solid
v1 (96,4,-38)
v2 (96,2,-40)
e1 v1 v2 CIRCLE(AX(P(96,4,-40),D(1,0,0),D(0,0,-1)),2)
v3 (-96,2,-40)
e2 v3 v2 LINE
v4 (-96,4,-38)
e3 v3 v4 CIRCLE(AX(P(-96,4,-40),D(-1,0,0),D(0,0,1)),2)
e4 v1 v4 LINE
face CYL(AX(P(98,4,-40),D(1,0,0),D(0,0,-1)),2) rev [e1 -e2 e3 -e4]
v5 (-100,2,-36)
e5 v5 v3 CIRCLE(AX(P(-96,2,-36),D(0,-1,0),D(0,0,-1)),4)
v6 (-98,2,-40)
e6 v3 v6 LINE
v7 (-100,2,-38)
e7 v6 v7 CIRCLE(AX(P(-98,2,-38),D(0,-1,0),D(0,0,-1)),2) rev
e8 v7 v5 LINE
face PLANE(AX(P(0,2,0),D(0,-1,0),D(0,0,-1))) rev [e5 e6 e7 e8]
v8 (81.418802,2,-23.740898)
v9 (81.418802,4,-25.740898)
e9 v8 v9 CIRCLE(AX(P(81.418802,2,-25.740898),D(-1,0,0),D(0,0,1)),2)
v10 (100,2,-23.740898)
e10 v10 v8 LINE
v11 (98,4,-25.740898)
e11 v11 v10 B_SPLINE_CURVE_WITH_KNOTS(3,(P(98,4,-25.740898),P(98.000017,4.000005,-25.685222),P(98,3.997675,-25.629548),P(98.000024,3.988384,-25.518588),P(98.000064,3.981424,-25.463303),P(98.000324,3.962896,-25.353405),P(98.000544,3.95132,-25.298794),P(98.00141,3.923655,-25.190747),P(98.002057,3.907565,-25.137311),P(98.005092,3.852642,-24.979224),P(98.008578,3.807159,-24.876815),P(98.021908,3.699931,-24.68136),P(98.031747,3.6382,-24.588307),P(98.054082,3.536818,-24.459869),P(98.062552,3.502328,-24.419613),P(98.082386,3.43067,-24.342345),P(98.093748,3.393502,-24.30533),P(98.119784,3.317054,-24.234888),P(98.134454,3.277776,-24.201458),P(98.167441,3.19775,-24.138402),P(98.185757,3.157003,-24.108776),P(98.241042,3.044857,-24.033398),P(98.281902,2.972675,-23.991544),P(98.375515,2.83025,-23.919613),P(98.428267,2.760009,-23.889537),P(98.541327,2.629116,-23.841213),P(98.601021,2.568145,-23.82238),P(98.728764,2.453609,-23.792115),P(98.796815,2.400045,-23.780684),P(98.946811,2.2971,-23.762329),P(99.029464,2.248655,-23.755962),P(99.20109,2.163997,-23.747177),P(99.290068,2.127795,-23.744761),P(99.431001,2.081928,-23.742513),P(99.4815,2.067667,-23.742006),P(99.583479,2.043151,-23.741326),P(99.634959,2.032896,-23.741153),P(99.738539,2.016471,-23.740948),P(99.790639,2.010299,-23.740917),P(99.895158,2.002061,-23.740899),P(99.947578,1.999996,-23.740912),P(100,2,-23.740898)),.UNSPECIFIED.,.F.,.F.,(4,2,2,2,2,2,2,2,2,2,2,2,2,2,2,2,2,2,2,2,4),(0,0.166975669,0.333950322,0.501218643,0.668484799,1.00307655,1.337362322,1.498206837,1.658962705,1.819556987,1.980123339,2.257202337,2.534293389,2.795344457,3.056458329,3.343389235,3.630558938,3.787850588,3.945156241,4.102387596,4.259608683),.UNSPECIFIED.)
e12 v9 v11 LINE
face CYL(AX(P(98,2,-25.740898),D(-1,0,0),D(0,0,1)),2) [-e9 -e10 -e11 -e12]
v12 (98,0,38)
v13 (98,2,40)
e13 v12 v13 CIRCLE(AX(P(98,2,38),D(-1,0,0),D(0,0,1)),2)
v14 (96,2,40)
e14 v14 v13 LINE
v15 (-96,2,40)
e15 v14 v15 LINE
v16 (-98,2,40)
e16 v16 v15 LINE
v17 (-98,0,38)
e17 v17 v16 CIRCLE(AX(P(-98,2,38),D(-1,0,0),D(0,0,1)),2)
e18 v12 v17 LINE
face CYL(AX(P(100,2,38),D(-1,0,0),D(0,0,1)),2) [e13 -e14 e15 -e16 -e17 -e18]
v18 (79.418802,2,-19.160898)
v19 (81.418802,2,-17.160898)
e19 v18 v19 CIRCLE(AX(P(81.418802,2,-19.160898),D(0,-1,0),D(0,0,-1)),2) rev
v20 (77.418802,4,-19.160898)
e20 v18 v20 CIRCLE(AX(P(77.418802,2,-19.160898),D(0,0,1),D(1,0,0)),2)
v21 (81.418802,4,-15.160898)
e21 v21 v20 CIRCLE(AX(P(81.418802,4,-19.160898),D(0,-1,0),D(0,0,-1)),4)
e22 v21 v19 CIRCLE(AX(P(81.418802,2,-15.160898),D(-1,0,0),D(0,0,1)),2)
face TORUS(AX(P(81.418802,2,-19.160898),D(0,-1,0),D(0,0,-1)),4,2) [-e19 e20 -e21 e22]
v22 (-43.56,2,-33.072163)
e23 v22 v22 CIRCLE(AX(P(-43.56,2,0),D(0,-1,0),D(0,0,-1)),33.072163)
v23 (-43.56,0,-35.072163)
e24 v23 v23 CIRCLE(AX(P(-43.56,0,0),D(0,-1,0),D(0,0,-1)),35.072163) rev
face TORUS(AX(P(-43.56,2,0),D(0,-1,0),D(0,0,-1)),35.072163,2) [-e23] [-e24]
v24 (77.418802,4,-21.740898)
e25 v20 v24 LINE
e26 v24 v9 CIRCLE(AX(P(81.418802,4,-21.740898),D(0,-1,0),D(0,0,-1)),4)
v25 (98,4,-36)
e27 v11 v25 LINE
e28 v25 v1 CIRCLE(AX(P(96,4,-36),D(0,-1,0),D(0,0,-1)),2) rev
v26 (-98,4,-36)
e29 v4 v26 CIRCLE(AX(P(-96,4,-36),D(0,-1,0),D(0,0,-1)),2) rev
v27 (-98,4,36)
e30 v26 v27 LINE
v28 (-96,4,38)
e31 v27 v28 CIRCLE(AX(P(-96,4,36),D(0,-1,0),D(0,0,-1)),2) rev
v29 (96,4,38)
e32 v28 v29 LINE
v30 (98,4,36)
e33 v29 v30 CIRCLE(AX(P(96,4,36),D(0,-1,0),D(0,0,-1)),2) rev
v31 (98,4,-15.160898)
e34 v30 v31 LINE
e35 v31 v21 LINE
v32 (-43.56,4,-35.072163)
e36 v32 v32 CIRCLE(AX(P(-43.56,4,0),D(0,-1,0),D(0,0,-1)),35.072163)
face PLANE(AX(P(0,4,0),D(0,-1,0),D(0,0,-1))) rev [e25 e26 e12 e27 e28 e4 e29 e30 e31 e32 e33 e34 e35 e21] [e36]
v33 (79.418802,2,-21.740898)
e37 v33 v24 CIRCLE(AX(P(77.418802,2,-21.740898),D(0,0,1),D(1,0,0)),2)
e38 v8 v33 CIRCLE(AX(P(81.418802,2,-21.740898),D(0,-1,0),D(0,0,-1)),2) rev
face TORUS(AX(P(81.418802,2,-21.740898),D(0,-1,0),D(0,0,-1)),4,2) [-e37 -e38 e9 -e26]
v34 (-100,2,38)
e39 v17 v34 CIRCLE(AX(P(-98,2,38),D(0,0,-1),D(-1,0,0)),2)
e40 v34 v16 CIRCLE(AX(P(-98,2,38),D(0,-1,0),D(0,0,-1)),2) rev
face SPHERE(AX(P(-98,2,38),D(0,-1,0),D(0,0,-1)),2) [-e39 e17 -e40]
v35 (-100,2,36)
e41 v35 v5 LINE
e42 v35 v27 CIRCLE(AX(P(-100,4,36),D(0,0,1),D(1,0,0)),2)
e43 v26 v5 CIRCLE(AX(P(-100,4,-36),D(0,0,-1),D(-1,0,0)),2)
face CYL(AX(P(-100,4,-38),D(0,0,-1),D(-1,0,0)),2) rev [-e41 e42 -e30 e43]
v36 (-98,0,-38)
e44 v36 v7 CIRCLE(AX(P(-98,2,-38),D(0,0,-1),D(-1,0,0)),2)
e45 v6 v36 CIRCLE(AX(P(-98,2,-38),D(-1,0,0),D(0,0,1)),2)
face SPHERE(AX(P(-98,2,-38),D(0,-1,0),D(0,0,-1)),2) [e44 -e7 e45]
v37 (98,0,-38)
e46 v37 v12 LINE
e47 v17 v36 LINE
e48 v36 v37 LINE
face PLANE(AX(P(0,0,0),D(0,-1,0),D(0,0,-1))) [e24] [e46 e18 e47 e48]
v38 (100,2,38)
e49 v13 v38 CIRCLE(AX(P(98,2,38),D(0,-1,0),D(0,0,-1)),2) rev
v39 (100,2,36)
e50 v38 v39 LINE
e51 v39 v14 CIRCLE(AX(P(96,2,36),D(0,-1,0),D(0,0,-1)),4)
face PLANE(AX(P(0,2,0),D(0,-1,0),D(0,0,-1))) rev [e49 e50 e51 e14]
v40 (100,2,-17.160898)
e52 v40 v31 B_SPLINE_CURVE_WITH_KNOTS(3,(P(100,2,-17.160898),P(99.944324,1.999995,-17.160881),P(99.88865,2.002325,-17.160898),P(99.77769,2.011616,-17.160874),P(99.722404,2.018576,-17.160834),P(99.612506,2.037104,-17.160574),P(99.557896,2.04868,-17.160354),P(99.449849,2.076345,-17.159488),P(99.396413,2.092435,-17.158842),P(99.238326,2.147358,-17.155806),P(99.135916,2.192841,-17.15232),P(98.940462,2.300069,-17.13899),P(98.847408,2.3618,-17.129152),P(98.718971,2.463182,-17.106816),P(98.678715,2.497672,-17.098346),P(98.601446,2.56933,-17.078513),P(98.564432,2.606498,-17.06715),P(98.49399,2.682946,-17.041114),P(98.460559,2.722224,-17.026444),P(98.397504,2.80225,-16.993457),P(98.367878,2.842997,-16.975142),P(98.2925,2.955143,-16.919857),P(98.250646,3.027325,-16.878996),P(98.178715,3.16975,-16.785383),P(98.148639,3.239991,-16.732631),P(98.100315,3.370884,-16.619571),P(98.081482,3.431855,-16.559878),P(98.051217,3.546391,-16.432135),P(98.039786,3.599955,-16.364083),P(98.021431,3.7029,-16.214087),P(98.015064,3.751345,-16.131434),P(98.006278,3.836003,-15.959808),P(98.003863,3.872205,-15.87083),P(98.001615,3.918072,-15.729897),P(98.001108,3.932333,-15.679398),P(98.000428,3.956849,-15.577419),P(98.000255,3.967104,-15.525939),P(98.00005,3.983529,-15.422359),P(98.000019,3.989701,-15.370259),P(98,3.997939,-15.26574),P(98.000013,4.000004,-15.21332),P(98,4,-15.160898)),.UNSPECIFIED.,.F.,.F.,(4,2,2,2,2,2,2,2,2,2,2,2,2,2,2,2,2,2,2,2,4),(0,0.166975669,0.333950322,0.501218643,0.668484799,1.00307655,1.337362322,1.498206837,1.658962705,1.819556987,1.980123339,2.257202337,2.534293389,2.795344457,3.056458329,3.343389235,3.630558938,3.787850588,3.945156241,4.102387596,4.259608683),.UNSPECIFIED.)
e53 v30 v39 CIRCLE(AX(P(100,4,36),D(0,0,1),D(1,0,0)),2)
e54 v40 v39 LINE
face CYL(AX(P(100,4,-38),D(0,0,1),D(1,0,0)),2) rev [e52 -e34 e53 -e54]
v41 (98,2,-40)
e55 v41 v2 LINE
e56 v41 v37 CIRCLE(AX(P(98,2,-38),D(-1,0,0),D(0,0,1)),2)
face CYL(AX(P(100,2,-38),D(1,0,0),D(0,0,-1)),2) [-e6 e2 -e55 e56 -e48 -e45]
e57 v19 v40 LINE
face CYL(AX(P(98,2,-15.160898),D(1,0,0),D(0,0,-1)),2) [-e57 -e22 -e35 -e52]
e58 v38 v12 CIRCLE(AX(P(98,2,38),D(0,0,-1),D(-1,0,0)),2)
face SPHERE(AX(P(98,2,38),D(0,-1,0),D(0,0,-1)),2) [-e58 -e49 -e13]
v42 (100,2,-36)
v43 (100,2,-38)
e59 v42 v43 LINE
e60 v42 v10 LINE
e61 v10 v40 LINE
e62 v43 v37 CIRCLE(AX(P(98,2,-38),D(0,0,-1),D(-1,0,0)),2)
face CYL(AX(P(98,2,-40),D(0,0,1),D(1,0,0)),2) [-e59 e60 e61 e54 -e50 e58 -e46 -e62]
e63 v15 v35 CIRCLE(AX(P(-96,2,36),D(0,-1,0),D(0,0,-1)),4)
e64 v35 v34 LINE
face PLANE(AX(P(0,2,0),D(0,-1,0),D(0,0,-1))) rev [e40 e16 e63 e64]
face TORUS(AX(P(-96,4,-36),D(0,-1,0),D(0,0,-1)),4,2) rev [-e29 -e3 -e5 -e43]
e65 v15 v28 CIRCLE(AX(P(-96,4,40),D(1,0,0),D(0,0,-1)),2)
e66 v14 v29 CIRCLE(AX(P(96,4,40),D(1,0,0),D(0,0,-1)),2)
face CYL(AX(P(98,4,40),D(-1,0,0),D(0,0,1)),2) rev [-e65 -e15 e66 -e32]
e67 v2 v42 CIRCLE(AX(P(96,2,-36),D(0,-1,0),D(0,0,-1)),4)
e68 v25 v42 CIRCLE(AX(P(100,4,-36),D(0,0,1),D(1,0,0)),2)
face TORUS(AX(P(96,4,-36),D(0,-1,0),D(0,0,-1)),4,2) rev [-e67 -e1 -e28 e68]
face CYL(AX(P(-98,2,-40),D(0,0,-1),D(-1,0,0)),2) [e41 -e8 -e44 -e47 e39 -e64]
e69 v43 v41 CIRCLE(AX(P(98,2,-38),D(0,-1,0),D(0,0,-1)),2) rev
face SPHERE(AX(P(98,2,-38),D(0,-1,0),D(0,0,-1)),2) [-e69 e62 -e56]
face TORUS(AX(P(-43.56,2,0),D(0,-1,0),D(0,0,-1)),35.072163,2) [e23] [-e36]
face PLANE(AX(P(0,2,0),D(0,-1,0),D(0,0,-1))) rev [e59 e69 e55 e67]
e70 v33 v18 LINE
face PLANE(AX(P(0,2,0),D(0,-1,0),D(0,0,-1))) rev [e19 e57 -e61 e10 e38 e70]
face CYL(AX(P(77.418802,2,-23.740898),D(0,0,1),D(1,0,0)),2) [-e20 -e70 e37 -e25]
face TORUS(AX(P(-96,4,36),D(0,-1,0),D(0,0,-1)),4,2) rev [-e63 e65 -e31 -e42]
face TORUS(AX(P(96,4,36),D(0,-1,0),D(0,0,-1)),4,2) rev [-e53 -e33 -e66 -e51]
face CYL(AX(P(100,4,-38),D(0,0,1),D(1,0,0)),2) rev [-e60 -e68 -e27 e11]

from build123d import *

# Parameters (mm, degrees)
SKETCH1_W           = 200
SKETCH1_H           = 80
BOSS_EXTRUDE1_DEPTH = 2
SKETCH2_W           = 196
SKETCH2_H           = 76
BOSS_EXTRUDE2_DEPTH = 2
FILLET1_R           = 2
FILLET2_R           = 2
FILLET3_R           = 2
SKETCH3_R           = 33.072163117
CUT_EXTRUDE1_DEPTH  = 25
FILLET4_R           = 2
FILLET5_R           = 2
SKETCH4_W           = 18.581197799
SKETCH4_H           = 6.58
CUT_EXTRUDE3_DEPTH  = 2
SKETCH5_W           = 3.741738876
SKETCH5_H           = 6.58
CUT_EXTRUDE4_DEPTH  = 2
FILLET6_R           = 2
FILLET7_R           = 2


with BuildPart() as part:
    # Sketch1 → Boss-Extrude1 (new body)
    with BuildSketch(Plane(origin=(0, 0, 0), x_dir=(1, 0, 0), z_dir=(0, 1, 0))):
        Rectangle(SKETCH1_W, SKETCH1_H)
    extrude(amount=BOSS_EXTRUDE1_DEPTH)

    # Sketch2 → Boss-Extrude2 (add)
    with BuildSketch(Plane(origin=(0, 2, 0), x_dir=(1, 0, 0), z_dir=(0, 1, 0))):
        Rectangle(SKETCH2_W, SKETCH2_H)
    extrude(amount=BOSS_EXTRUDE2_DEPTH)

    # Fillet1
    fillet1_edges = [part.edges().sort_by_distance(p)[0] for p in [
        (-100, 1, -40),
        (100, 1, -40),
        (100, 1, 40),
        (-100, 1, 40),
    ]]
    fillet(fillet1_edges, radius=FILLET1_R)

    # Fillet2
    fillet2_edges = [part.edges().sort_by_distance(p)[0] for p in [
        (-98, 3, -38),
        (-98, 3, 38),
        (98, 3, 38),
        (98, 3, -38),
    ]]
    fillet(fillet2_edges, radius=FILLET2_R)

    # Fillet3
    fillet3_edges = [part.edges().sort_by_distance(p)[0] for p in [
        (-99.414213562, 0, -39.414213562),
        (0, 0, -40),
        (99.414213562, 0, -39.414213562),
        (100, 0, 0),
        (99.414213562, 0, 39.414213562),
        (0, 0, 40),
        (-99.414213562, 0, 39.414213562),
        (-97.414213562, 2, 37.414213562),
        (-98, 2, 0),
        (-97.414213562, 2, -37.414213562),
        (0, 2, -38),
        (97.414213562, 2, -37.414213562),
        (98, 2, 0),
        (97.414213562, 2, 37.414213562),
        (-100, 0, 0),
        (0, 2, 38),
    ]]
    fillet(fillet3_edges, radius=FILLET3_R - 0.0001)  # a hair under: the kernel refuses the full size

    # Sketch3 → Cut-Extrude1 (cut)
    with BuildSketch(Plane.XZ):
        with Locations(Location((-43.56, 0, 0), (0, 0, 270))):
            Circle(SKETCH3_R)
    extrude(amount=-CUT_EXTRUDE1_DEPTH, mode=Mode.SUBTRACT)

    # Fillet4
    fillet4_edges = [part.edges().sort_by_distance(p)[0] for p in [
        (-43.56, 0, 33.072163117),
    ]]
    fillet(fillet4_edges, radius=FILLET4_R)

    # Fillet5
    fillet5_edges = [part.edges().sort_by_distance(p)[0] for p in [
        (-43.56, 4, 33.072163117),
    ]]
    fillet(fillet5_edges, radius=FILLET5_R - 0.0001)  # a hair under: the kernel refuses the full size

    # Sketch4 → Cut-Extrude3 (cut)
    with BuildSketch(Plane(origin=(0, 4, 0), x_dir=(1, 0, 0), z_dir=(0, 1, 0))):
        with Locations((88.709401101, 20.450898194)):
            Rectangle(SKETCH4_W, SKETCH4_H)
    extrude(amount=-CUT_EXTRUDE3_DEPTH, mode=Mode.SUBTRACT)

    # Sketch5 → Cut-Extrude4 (cut)
    with BuildSketch(Plane(origin=(0, 2, 0), x_dir=(1, 0, 0), z_dir=(0, 1, 0))):
        with Locations((99.870869438, 20.450898194)):
            Rectangle(SKETCH5_W, SKETCH5_H)
    extrude(amount=CUT_EXTRUDE4_DEPTH, mode=Mode.SUBTRACT)

    # Fillet6
    fillet6_edges = [part.edges().sort_by_distance(p)[0] for p in [
        (79.418802201, 3, -17.160898194),
        (79.418802201, 3, -23.740898194),
    ]]
    fillet(fillet6_edges, radius=FILLET6_R)

    # Fillet7
    fillet7_edges = [part.edges().sort_by_distance(p)[0] for p in [
        (80.004588639, 4, -17.746684631),
        (80.004588639, 4, -23.155111756),
        (79.418802201, 4, -20.450898194),
        (89.709401101, 4, -17.160898194),
        (89.709401101, 4, -23.740898194),
    ]]
    fillet(fillet7_edges, radius=FILLET7_R - 0.0001)  # a hair under: the kernel refuses the full size


solid = part.part
